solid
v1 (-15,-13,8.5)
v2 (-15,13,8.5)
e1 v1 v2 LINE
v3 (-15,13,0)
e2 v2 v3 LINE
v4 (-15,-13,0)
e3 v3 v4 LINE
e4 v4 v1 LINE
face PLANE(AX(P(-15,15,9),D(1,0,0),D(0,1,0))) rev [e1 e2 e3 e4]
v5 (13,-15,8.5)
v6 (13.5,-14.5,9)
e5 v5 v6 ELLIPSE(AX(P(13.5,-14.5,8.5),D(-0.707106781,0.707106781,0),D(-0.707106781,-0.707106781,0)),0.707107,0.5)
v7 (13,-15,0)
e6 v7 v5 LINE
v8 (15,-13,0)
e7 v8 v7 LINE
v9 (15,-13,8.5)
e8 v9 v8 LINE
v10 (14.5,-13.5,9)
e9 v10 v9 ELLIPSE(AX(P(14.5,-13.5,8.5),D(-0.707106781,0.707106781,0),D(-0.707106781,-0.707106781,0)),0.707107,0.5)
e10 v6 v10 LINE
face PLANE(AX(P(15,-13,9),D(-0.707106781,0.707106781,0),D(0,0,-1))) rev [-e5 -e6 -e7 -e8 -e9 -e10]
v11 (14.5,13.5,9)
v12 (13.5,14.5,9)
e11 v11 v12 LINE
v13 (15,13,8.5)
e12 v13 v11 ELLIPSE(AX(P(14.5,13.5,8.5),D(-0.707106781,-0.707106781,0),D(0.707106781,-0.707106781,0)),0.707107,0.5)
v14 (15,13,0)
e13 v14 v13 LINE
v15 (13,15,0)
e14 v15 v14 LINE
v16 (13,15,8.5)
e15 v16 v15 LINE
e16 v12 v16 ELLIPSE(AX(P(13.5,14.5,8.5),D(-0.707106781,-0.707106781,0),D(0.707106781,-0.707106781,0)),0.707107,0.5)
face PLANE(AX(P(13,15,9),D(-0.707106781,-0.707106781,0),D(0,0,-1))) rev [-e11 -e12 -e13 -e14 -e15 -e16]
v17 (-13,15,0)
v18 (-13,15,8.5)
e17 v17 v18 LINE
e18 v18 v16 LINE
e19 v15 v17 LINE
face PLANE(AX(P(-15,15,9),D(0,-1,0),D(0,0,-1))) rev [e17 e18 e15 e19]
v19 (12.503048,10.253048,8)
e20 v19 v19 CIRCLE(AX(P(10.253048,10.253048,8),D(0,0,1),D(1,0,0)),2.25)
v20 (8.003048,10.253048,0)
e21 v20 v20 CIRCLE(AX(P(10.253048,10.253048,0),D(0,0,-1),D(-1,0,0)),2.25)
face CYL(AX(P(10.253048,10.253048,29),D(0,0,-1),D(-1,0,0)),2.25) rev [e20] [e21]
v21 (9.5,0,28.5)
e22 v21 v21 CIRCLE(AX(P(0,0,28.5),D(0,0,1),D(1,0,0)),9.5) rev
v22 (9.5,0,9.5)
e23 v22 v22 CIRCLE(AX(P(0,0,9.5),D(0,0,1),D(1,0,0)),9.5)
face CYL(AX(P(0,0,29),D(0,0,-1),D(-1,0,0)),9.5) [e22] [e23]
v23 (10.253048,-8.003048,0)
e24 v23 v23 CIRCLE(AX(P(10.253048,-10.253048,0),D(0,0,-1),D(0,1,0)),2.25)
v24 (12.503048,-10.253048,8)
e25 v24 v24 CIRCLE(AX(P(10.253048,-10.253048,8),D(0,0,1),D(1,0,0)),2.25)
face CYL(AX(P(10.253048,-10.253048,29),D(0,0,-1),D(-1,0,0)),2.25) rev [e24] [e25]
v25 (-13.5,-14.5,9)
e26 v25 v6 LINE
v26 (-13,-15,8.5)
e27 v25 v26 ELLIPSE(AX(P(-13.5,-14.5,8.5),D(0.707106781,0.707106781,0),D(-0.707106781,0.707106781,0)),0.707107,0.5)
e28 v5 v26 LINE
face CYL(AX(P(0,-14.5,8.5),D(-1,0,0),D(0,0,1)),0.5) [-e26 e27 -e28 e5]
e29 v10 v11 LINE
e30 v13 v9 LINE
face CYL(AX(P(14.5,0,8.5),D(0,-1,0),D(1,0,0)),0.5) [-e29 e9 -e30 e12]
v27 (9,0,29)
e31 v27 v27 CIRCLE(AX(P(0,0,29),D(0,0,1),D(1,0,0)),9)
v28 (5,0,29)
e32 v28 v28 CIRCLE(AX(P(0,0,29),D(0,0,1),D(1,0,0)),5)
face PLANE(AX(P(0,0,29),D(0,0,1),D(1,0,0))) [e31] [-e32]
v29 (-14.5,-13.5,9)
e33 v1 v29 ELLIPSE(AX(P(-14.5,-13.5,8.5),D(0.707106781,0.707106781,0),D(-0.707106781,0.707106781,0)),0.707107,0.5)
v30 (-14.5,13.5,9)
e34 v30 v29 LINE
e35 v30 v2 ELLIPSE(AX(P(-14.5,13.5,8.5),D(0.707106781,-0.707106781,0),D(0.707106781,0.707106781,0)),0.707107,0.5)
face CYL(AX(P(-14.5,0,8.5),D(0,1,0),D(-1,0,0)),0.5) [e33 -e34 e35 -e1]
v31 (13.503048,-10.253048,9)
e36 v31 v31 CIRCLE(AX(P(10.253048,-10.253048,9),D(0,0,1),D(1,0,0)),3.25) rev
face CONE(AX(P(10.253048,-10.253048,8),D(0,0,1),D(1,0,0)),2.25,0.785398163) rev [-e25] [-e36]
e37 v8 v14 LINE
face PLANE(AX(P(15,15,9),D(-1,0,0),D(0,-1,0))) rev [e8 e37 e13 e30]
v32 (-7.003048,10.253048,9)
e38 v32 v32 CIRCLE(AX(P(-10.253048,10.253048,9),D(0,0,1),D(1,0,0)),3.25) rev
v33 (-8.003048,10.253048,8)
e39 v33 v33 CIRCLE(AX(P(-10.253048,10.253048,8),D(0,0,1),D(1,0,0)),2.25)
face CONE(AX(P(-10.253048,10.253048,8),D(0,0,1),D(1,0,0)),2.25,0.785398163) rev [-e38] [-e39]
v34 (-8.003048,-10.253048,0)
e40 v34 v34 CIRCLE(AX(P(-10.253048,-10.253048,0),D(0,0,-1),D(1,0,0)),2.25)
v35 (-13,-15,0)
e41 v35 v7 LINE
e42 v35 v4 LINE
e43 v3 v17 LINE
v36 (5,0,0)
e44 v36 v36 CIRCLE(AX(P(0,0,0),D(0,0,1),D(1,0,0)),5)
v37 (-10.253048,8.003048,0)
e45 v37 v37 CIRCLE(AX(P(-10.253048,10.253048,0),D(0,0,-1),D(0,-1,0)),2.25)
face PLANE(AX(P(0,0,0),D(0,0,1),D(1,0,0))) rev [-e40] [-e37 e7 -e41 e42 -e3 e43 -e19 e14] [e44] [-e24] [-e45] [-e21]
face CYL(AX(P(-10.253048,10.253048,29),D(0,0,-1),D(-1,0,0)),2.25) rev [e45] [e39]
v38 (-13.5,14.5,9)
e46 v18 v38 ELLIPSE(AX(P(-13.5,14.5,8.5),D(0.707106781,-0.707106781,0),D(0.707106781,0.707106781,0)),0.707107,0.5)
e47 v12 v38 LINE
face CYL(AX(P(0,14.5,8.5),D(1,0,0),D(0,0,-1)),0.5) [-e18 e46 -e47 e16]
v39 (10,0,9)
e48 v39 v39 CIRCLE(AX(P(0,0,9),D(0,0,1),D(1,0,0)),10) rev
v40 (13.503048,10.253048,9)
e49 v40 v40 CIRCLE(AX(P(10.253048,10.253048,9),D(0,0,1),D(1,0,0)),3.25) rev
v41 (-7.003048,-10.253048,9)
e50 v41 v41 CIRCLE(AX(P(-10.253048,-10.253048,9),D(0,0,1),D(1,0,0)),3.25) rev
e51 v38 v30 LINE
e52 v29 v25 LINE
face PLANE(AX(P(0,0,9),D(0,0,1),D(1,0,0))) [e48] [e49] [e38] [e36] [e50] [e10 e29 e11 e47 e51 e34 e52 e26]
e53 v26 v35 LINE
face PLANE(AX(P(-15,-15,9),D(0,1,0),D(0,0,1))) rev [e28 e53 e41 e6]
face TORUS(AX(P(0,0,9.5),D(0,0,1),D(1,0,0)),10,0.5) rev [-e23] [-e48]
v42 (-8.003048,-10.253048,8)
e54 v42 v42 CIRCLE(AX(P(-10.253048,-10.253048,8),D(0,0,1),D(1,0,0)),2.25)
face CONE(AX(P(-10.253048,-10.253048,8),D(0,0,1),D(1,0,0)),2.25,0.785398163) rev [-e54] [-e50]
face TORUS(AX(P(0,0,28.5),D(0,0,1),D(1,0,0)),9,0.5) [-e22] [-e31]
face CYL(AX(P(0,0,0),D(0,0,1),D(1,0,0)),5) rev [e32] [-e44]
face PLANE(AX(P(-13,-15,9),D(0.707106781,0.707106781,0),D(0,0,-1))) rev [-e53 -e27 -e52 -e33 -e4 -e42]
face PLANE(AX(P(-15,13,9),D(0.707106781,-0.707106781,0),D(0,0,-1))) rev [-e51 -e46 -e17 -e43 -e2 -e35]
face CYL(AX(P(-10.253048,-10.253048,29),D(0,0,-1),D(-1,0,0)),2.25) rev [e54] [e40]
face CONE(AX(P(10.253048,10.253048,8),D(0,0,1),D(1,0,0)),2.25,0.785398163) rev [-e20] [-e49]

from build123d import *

# Parameters (mm, degrees)
SKETCH1_W                    = 30
SKETCH1_H                    = 30
BOSS_EXTRUDE1_DEPTH          = 9
SKETCH2_R                    = 9.5
BOSS_EXTRUDE2_DEPTH          = 20
SKETCH3_R                    = 5
CUT_EXTRUDE1_DEPTH           = 36.930488446
SKETCH4_R                    = 2.25
CUT_EXTRUDE2_DEPTH           = 36.930488446
CHAMFER1_SIZE                = 1
CIRPATTERN1_COUNT            = 4
CHAMFER1_OF_CIRPATTERN1_SIZE = 1
FILLET1_R                    = 0.5
CHAMFER2_SIZE                = 2


with BuildPart() as part:
    # Sketch1 → Boss-Extrude1 (new body)
    with BuildSketch(Plane.XY):
        Rectangle(SKETCH1_W, SKETCH1_H)
    extrude(amount=BOSS_EXTRUDE1_DEPTH)

    # Sketch2 → Boss-Extrude2 (add)
    with BuildSketch(Plane.XY.offset(9)):
        Circle(SKETCH2_R)
    extrude(amount=BOSS_EXTRUDE2_DEPTH)

    # Sketch3 → Cut-Extrude1 (cut, through all)
    with BuildSketch(Plane.XY.offset(29)):
        Circle(SKETCH3_R)
    extrude(amount=-CUT_EXTRUDE1_DEPTH, mode=Mode.SUBTRACT)

    # Sketch4 → Cut-Extrude2 (cut, through all)
    with BuildSketch(Plane(origin=(0, 0, 0), x_dir=(-1, 0, 0), z_dir=(0, 0, -1))):
        with Locations((-10.253048327, 10.253048327)):
            Circle(SKETCH4_R)
    cut_extrude2 = extrude(amount=-CUT_EXTRUDE2_DEPTH, mode=Mode.SUBTRACT)

    # Chamfer1
    chamfer1_edges = [part.edges().sort_by_distance(p)[0] for p in [
        (12.503048327, 10.253048327, 9),
    ]]
    chamfer(chamfer1_edges, length=CHAMFER1_SIZE)

    # CirPattern1: Cut-Extrude2 ×4 about axis
    cirpattern1_axis = Axis((0, 0, 0), (0, 0, 1))
    for i in range(1, CIRPATTERN1_COUNT):
        add(cut_extrude2.rotate(cirpattern1_axis, i * 360 / CIRPATTERN1_COUNT), mode=Mode.SUBTRACT)

    # Chamfer1 of CirPattern1
    chamfer1_of_cirpattern1_edges = [part.edges().sort_by_distance(p)[0] for p in [
        (-10.253048327, 12.503048327, 9),
        (-12.503048327, -10.253048327, 9),
        (10.253048327, -12.503048327, 9),
    ]]
    chamfer(chamfer1_of_cirpattern1_edges, length=CHAMFER1_OF_CIRPATTERN1_SIZE)

    # Fillet1
    fillet1_edges = [part.edges().sort_by_distance(p)[0] for p in [
        (-15, 0, 9),
        (0, -15, 9),
        (-9.5, 0, 9),
        (-9.5, 0, 29),
        (15, 0, 9),
        (0, 15, 9),
    ]]
    fillet(fillet1_edges, radius=FILLET1_R)

    # Chamfer2
    # the kernel refuses this chamfer: 2 mm, written as the material it takes off along each edge
    with BuildSketch(Plane(origin=(15, -15, -5.143365976), x_dir=(-0.9996219169112968, -0.027495876610586487, 0), z_dir=(0, 0, 1)), Plane(origin=(-15, -15, -5.143365976), x_dir=(-0.027495876610586487, 0.9996219169112968, 0), z_dir=(0, 0, 1))) as chamfer2_piece_1:
        Polygon((CHAMFER2_SIZE * 0.999621916911, -CHAMFER2_SIZE * 0.0274958766106), (-CHAMFER2_SIZE * 0.0274958766106, -CHAMFER2_SIZE * 0.999621916911), (0, 0), align=None)
    extrude(amount=18.786731952, mode=Mode.SUBTRACT)
    with BuildSketch(Plane(origin=(15, 15, -5.143365976), x_dir=(-0.9996219169112968, 0.027495876610586487, 0), z_dir=(0, 0, 1)), Plane(origin=(-15, 15, -5.143365976), x_dir=(-0.027495876610586487, -0.9996219169112968, 0), z_dir=(0, 0, 1))) as chamfer2_piece_2:
        Polygon((CHAMFER2_SIZE * 0.999621916911, CHAMFER2_SIZE * 0.0274958766106), (-CHAMFER2_SIZE * 0.0274958766106, CHAMFER2_SIZE * 0.999621916911), (0, 0), align=None)
    extrude(amount=18.786731952, mode=Mode.SUBTRACT)


solid = part.part
